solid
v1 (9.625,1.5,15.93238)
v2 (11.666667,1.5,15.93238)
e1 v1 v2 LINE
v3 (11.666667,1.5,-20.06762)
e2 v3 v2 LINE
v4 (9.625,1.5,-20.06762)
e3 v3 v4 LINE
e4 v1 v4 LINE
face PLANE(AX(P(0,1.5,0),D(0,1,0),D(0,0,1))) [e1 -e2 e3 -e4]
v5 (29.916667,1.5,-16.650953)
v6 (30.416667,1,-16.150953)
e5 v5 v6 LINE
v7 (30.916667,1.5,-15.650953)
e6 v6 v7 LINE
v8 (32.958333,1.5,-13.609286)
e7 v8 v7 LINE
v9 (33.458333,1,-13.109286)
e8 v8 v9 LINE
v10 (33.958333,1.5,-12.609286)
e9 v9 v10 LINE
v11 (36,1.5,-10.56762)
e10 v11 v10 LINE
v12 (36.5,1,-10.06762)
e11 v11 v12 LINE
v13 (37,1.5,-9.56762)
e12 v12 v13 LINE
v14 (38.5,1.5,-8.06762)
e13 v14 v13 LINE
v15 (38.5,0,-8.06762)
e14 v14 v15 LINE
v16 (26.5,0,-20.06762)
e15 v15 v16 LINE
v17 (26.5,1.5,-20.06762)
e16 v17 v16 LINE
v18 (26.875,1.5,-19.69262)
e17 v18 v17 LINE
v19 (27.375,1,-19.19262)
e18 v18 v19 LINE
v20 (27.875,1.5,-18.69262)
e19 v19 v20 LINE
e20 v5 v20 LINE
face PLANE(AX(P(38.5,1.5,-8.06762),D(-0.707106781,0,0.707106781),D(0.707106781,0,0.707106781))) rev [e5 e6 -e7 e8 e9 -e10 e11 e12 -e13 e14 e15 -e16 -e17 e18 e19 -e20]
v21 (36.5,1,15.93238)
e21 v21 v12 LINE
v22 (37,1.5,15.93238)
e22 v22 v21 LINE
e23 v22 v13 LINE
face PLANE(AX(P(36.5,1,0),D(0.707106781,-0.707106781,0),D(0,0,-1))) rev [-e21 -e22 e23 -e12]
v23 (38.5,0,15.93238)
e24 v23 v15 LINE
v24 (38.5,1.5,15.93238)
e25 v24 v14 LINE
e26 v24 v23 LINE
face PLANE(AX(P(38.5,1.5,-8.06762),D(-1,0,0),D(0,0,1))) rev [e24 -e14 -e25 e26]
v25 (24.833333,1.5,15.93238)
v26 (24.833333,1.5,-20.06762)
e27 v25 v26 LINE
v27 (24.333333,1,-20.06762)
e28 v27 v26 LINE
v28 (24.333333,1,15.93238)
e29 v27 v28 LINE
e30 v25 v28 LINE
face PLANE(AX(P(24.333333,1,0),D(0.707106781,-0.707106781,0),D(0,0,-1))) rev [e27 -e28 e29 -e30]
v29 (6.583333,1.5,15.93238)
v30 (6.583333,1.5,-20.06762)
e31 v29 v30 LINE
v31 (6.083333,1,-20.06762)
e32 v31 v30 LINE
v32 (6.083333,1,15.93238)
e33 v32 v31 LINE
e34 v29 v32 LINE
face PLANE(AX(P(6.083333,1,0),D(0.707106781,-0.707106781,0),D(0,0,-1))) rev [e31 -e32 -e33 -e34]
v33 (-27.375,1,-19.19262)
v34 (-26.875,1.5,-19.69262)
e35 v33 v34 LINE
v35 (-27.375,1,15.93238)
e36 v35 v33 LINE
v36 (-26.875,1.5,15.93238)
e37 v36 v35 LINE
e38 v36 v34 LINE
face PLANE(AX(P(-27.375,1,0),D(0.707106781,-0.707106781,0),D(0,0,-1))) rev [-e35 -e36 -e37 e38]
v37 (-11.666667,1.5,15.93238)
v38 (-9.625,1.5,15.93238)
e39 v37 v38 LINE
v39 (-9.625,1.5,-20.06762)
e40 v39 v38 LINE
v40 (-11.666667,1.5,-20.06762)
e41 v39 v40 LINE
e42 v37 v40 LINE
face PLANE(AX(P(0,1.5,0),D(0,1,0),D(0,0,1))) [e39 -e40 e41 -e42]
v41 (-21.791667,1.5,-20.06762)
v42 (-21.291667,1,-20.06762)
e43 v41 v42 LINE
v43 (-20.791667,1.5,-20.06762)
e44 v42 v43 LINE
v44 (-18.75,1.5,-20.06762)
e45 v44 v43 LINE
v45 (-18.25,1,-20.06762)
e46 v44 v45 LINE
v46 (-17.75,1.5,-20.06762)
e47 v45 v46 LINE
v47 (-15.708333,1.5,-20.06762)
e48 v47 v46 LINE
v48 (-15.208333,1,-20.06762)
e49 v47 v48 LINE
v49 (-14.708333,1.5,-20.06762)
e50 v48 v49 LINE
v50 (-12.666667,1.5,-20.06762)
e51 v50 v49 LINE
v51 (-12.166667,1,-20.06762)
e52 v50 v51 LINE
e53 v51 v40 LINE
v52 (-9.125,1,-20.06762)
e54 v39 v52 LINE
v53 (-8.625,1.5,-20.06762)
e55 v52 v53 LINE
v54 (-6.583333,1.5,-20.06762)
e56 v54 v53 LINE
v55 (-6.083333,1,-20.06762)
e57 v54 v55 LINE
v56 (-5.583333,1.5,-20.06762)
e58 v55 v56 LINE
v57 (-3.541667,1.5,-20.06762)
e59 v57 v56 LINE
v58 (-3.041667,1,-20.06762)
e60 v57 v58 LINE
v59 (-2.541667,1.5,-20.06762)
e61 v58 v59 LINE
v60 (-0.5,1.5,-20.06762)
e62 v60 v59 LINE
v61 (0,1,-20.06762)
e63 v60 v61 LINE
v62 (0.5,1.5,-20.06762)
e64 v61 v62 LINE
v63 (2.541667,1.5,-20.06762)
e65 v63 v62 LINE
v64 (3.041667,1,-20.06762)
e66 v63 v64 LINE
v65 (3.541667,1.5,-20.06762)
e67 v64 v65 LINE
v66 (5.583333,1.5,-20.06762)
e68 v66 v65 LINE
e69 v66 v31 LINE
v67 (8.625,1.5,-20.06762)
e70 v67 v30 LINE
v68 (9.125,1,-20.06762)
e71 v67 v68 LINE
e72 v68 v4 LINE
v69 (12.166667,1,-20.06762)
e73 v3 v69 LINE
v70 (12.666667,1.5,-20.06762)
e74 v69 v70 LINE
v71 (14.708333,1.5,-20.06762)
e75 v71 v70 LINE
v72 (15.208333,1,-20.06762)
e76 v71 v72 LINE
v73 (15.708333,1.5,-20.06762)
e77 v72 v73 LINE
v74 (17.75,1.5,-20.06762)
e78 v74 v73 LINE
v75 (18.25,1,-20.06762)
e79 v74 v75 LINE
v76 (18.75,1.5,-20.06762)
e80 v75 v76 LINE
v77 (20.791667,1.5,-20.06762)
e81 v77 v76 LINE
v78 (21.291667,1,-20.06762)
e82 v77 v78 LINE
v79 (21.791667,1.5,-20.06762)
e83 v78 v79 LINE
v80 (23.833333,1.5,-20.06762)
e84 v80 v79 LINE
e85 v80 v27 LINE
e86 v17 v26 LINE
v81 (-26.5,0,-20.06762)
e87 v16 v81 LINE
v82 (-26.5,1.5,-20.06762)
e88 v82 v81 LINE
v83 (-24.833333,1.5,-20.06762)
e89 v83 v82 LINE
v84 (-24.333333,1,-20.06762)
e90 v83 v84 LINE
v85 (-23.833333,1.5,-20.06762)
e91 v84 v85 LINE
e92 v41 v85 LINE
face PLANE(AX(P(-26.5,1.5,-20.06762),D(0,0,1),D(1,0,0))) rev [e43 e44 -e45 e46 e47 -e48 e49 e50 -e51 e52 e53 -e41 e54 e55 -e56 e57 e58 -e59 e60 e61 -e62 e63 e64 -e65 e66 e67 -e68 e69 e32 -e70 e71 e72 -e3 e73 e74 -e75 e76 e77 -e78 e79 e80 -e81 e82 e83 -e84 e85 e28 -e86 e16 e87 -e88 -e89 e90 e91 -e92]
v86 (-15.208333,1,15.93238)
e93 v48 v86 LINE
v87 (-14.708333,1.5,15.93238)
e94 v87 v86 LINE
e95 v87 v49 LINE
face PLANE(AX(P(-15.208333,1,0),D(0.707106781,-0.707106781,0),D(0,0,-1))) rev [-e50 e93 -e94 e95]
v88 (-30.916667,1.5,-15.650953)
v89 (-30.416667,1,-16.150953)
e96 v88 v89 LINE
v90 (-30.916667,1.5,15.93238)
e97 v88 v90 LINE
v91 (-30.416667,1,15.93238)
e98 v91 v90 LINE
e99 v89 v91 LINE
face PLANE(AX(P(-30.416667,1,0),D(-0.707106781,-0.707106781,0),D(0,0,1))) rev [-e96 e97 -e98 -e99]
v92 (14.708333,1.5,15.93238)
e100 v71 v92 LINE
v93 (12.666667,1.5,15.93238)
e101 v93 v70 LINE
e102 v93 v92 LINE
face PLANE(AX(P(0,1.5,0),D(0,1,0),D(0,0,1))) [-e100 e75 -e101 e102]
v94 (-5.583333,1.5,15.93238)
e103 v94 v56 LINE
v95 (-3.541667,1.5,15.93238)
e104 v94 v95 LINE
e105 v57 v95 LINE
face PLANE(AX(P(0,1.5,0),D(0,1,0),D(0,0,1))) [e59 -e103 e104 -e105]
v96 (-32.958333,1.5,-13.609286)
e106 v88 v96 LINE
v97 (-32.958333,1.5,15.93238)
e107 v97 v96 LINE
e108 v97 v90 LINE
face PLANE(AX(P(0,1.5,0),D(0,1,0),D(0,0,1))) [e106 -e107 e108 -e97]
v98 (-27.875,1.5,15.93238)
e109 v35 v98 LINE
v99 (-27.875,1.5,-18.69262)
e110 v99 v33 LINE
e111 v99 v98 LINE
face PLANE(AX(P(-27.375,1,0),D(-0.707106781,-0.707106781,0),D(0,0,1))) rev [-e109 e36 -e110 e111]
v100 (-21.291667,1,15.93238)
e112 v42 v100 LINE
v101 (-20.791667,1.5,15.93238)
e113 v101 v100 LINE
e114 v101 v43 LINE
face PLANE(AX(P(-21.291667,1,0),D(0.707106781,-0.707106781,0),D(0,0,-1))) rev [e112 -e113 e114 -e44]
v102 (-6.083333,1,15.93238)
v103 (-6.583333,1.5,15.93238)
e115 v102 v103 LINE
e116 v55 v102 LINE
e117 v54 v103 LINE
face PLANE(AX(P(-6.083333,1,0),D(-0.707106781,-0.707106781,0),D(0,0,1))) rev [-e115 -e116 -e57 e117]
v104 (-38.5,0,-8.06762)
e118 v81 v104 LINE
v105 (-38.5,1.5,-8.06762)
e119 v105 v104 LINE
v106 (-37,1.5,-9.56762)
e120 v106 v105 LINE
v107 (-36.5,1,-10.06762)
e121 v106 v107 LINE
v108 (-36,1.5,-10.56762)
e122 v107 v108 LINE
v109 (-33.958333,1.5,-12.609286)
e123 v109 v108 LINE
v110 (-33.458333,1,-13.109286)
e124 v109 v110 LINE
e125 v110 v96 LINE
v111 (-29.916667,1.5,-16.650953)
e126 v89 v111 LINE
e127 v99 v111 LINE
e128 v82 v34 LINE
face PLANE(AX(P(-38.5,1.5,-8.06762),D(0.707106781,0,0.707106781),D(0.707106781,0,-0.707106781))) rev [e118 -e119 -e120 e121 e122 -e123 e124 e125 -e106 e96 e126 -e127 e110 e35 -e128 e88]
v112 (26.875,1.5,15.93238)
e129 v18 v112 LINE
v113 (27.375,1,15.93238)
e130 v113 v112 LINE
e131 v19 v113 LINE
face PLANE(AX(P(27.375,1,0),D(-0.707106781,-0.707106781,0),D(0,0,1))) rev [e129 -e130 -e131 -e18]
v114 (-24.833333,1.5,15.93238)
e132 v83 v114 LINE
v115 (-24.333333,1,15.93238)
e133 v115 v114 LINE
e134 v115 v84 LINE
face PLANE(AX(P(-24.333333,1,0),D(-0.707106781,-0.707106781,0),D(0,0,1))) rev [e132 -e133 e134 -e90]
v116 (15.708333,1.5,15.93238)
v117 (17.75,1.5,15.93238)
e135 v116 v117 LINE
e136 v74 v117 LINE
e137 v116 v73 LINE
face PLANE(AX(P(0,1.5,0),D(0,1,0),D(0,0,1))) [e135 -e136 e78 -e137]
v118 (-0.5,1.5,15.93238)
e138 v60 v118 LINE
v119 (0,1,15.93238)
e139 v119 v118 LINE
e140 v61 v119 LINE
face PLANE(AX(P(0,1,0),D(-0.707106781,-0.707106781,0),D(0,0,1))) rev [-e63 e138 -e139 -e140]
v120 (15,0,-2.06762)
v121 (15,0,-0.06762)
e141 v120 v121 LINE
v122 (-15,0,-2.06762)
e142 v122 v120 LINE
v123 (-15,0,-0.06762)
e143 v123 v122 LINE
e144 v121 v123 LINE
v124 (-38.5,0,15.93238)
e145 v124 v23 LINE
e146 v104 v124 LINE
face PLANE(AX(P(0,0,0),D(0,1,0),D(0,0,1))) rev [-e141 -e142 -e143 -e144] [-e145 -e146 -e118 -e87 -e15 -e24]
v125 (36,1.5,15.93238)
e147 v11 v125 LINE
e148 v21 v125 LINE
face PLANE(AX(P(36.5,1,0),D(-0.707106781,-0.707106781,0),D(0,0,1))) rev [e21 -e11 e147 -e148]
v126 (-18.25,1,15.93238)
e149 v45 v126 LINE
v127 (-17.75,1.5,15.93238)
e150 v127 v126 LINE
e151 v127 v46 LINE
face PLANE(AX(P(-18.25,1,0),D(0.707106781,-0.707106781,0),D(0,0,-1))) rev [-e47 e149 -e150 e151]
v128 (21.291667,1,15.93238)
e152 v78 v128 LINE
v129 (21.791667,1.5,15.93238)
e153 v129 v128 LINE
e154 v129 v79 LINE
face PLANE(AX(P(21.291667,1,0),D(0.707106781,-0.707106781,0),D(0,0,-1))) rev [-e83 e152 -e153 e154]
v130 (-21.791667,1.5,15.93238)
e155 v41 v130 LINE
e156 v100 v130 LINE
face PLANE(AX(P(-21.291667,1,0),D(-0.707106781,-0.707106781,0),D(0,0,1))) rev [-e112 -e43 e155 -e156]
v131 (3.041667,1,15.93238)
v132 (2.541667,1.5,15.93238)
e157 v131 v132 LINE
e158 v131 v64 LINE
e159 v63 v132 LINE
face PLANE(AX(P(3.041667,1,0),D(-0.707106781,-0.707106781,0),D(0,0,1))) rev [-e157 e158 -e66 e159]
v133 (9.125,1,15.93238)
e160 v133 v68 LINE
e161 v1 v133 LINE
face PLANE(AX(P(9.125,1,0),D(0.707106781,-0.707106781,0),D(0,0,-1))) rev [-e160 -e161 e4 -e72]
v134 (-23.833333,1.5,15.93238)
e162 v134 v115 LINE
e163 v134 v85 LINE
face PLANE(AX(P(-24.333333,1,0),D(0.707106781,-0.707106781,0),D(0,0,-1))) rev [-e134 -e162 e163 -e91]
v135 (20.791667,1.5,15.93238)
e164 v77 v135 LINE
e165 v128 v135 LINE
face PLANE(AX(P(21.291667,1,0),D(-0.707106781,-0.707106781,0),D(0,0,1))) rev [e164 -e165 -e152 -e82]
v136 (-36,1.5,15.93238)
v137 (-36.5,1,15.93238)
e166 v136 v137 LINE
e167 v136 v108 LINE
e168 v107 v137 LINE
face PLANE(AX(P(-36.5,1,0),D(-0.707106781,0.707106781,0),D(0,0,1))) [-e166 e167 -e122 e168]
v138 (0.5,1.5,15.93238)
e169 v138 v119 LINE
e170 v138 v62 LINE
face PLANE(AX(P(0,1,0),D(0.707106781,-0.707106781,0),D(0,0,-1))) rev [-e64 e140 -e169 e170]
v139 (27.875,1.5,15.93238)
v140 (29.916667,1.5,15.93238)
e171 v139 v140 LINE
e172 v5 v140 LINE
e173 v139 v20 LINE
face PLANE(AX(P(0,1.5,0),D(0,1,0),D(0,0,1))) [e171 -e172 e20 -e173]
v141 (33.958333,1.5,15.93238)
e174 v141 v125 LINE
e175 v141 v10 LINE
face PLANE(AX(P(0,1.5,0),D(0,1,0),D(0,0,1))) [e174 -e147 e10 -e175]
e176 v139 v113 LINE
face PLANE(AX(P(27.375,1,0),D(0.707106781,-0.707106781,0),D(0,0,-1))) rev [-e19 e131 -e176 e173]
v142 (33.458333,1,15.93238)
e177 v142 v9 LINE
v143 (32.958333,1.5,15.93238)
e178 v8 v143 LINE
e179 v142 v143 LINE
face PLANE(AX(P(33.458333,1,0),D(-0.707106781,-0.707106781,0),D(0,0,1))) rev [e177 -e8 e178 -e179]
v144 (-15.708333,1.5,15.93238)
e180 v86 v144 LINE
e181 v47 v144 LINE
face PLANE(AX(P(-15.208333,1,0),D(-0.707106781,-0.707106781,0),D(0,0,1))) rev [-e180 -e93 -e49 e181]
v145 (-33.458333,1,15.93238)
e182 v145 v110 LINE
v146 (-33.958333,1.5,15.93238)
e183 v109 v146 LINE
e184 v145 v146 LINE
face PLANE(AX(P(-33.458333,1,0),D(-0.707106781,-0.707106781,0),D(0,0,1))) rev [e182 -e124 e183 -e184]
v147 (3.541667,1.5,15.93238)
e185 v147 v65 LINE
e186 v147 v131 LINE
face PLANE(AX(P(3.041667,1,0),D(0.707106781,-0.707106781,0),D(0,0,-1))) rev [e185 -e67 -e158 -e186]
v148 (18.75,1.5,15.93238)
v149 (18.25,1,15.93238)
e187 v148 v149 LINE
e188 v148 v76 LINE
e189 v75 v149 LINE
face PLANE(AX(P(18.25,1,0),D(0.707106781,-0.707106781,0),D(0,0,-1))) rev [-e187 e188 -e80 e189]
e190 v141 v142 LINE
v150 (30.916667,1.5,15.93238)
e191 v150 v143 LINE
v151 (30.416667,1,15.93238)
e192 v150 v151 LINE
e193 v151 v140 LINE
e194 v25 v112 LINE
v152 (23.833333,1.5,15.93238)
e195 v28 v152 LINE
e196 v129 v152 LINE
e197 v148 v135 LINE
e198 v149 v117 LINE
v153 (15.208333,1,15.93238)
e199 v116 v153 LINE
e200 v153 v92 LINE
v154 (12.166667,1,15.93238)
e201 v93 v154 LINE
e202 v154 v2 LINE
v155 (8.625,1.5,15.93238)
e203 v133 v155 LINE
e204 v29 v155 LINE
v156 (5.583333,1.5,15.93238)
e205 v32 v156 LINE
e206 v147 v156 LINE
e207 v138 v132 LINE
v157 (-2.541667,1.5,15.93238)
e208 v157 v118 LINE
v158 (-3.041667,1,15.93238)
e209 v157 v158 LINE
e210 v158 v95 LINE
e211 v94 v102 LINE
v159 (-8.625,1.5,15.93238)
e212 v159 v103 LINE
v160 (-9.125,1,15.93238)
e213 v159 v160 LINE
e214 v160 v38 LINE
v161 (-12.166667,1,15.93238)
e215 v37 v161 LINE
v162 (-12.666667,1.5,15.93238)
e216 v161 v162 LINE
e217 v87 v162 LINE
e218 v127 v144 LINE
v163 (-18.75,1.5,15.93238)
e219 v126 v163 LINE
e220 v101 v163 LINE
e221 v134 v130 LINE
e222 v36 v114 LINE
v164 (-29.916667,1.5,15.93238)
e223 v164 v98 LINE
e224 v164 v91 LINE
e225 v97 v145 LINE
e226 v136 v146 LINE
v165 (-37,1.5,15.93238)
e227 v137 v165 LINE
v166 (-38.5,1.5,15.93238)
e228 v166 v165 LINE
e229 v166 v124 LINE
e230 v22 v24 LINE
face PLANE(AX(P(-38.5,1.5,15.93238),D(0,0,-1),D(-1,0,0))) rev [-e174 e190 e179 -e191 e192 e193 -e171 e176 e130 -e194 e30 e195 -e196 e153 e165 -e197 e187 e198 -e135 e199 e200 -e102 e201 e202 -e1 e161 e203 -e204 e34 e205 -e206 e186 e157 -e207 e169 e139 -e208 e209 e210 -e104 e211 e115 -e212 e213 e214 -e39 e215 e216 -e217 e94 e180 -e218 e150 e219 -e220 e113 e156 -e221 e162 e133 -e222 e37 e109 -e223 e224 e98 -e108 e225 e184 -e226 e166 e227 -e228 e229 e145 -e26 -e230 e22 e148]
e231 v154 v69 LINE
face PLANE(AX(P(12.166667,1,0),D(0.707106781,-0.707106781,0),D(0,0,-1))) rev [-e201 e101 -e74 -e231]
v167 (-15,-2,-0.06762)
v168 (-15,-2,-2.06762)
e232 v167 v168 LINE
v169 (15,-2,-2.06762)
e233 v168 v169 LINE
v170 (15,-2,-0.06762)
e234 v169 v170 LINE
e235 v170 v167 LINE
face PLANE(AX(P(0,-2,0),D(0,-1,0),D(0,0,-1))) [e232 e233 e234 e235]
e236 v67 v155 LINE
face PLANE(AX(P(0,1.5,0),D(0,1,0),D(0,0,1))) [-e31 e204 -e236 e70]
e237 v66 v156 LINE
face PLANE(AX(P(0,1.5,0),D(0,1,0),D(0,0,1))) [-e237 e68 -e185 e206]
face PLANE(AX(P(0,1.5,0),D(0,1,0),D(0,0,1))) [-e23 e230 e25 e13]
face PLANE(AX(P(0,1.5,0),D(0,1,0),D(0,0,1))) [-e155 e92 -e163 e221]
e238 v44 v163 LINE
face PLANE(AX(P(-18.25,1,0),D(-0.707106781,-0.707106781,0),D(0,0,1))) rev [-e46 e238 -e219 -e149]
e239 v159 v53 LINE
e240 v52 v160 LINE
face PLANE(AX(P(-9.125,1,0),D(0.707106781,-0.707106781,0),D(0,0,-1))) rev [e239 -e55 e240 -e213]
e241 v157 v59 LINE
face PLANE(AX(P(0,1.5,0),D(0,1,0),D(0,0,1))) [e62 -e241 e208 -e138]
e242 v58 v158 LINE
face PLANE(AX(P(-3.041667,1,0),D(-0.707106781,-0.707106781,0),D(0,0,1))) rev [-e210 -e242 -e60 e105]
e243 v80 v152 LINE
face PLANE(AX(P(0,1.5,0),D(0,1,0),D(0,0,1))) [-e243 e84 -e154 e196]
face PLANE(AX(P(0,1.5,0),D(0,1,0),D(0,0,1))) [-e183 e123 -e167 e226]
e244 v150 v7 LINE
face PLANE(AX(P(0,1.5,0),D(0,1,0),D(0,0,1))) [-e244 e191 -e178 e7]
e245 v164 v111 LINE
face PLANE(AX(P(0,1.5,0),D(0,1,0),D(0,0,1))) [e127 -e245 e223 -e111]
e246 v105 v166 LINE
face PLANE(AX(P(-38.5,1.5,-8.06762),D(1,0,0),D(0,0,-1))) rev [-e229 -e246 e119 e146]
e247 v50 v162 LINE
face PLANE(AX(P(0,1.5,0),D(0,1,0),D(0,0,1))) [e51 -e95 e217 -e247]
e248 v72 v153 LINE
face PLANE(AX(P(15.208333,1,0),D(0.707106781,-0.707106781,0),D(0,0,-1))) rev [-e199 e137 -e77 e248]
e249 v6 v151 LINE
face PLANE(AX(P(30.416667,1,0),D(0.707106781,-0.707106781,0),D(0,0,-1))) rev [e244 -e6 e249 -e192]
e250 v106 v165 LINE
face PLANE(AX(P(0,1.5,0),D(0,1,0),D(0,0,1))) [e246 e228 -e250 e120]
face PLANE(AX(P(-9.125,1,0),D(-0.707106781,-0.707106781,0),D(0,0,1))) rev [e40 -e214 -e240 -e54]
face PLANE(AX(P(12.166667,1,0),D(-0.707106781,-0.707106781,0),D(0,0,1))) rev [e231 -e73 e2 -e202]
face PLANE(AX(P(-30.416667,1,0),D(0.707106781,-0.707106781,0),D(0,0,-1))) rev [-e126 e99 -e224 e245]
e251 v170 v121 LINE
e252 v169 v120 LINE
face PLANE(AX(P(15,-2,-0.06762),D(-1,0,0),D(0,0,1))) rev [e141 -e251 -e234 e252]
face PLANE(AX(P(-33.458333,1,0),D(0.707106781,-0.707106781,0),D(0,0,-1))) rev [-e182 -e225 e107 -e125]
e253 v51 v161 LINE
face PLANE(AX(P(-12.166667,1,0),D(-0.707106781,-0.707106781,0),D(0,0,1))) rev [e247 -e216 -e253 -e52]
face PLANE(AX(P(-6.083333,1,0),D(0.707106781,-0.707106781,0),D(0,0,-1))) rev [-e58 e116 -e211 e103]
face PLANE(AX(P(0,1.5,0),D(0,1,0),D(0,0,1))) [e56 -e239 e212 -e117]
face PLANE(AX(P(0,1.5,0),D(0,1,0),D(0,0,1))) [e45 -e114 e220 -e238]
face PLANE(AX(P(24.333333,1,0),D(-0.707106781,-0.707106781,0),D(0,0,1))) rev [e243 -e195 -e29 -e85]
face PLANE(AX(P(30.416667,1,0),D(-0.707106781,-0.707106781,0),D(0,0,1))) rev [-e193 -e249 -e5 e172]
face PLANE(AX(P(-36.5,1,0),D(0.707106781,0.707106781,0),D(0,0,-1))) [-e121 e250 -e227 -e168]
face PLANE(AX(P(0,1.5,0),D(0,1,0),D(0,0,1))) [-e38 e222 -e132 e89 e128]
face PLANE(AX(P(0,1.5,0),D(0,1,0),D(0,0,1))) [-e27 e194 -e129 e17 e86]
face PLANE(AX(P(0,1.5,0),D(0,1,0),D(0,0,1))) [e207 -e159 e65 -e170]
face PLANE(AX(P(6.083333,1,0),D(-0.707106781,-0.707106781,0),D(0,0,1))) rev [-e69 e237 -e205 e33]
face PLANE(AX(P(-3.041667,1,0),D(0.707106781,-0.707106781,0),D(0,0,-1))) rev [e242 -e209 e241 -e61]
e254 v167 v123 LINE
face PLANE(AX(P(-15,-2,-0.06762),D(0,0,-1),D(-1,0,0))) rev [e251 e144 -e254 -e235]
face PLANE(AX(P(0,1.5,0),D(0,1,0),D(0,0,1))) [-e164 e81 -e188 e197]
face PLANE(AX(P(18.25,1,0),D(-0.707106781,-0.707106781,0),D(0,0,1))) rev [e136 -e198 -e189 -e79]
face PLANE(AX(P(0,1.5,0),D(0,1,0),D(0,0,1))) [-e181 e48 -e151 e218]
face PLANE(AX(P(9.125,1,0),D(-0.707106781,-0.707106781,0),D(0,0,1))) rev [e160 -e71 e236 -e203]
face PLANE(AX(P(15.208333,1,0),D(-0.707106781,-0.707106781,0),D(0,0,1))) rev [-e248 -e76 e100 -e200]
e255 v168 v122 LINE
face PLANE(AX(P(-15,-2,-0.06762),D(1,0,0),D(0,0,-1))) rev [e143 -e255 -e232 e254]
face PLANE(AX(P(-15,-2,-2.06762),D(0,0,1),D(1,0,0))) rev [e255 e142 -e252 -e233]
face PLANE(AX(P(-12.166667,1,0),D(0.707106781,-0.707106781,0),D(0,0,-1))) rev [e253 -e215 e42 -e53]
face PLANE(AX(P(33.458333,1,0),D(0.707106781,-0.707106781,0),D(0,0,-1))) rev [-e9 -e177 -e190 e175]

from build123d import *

# Parameters (mm, degrees)
BOSS_EXTRUDE1_DEPTH = 1.5
SKETCH2_W           = 1
SKETCH2_H           = 36
CUT_EXTRUDE1_DEPTH  = 0.5
SKETCH3_W           = 30
SKETCH3_H           = 2
BOSS_EXTRUDE2_DEPTH = 2
CHAMFER1_SIZE       = 0.5


with BuildPart() as part:
    # Sketch1 → Boss-Extrude1 (new body)
    with BuildSketch(Plane(origin=(0, 0, 0), x_dir=(1, 0, 0), z_dir=(0, 1, 0))):
        Polygon((-38.5, 8.06761956), (-26.5, 20.06761956), (26.5, 20.06761956), (38.5, 8.06761956), (38.5, -15.93238044), (-38.5, -15.93238044), align=None)
    extrude(amount=BOSS_EXTRUDE1_DEPTH)

    # Sketch2 → Cut-Extrude1 (cut)
    with BuildSketch(Plane(origin=(0, 1.5, 0), x_dir=(1, 0, 0), z_dir=(0, 1, 0))):
        with Locations((-36.5, 2.06761956)):
            Rectangle(SKETCH2_W, SKETCH2_H)
        with Locations((-33.458333333, 2.06761956)):
            Rectangle(SKETCH2_W, SKETCH2_H)
        with Locations((-30.416666667, 2.06761956)):
            Rectangle(SKETCH2_W, SKETCH2_H)
        with Locations((-27.375, 2.06761956)):
            Rectangle(SKETCH2_W, SKETCH2_H)
        with Locations((-24.333333333, 2.06761956)):
            Rectangle(SKETCH2_W, SKETCH2_H)
        with Locations((-21.291666667, 2.06761956)):
            Rectangle(SKETCH2_W, SKETCH2_H)
        with Locations((-18.25, 2.06761956)):
            Rectangle(SKETCH2_W, SKETCH2_H)
        with Locations((-15.208333333, 2.06761956)):
            Rectangle(SKETCH2_W, SKETCH2_H)
        with Locations((-12.166666667, 2.06761956)):
            Rectangle(SKETCH2_W, SKETCH2_H)
        with Locations((-9.125, 2.06761956)):
            Rectangle(SKETCH2_W, SKETCH2_H)
        with Locations((-6.083333333, 2.06761956)):
            Rectangle(SKETCH2_W, SKETCH2_H)
        with Locations((-3.041666667, 2.06761956)):
            Rectangle(SKETCH2_W, SKETCH2_H)
        with Locations((0, 2.06761956)):
            Rectangle(SKETCH2_W, SKETCH2_H)
        with Locations((3.041666667, 2.06761956)):
            Rectangle(SKETCH2_W, SKETCH2_H)
        with Locations((6.083333333, 2.06761956)):
            Rectangle(SKETCH2_W, SKETCH2_H)
        with Locations((9.125, 2.06761956)):
            Rectangle(SKETCH2_W, SKETCH2_H)
        with Locations((12.166666667, 2.06761956)):
            Rectangle(SKETCH2_W, SKETCH2_H)
        with Locations((15.208333333, 2.06761956)):
            Rectangle(SKETCH2_W, SKETCH2_H)
        with Locations((18.25, 2.06761956)):
            Rectangle(SKETCH2_W, SKETCH2_H)
        with Locations((21.291666667, 2.06761956)):
            Rectangle(SKETCH2_W, SKETCH2_H)
        with Locations((24.333333333, 2.06761956)):
            Rectangle(SKETCH2_W, SKETCH2_H)
        with Locations((27.375, 2.06761956)):
            Rectangle(SKETCH2_W, SKETCH2_H)
        with Locations((30.416666667, 2.06761956)):
            Rectangle(SKETCH2_W, SKETCH2_H)
        with Locations((33.458333333, 2.06761956)):
            Rectangle(SKETCH2_W, SKETCH2_H)
        with Locations((36.5, 2.06761956)):
            Rectangle(SKETCH2_W, SKETCH2_H)
    extrude(amount=-CUT_EXTRUDE1_DEPTH, mode=Mode.SUBTRACT)

    # Sketch3 → Boss-Extrude2 (add)
    with BuildSketch(Plane.XZ):
        with Locations((0, -1.06761956)):
            Rectangle(SKETCH3_W, SKETCH3_H)
    extrude(amount=BOSS_EXTRUDE2_DEPTH)

    # Chamfer1
    chamfer1_edges = [part.edges().sort_by_distance(p)[0] for p in [
        (36, 1, 2.68238044),
        (32.958333333, 1, 1.161547107),
        (37, 1, 3.18238044),
        (33.958333333, 1, 1.661547107),
        (30.916666667, 1, 0.140713774),
        (27.875, 1, -1.38011956),
        (24.833333333, 1, -2.06761956),
        (21.791666667, 1, -2.06761956),
        (18.75, 1, -2.06761956),
        (15.708333333, 1, -2.06761956),
        (29.916666667, 1, -0.359286226),
        (26.875, 1, -1.88011956),
        (23.833333333, 1, -2.06761956),
        (20.791666667, 1, -2.06761956),
        (17.75, 1, -2.06761956),
        (14.708333333, 1, -2.06761956),
        (11.666666667, 1, -2.06761956),
        (8.625, 1, -2.06761956),
        (5.583333333, 1, -2.06761956),
        (2.541666667, 1, -2.06761956),
        (12.666666667, 1, -2.06761956),
        (9.625, 1, -2.06761956),
        (6.583333333, 1, -2.06761956),
        (3.541666667, 1, -2.06761956),
        (0.5, 1, -2.06761956),
        (-2.541666667, 1, -2.06761956),
        (-5.583333333, 1, -2.06761956),
        (-8.625, 1, -2.06761956),
        (-11.666666667, 1, -2.06761956),
        (-14.708333333, 1, -2.06761956),
        (-17.75, 1, -2.06761956),
        (-20.791666667, 1, -2.06761956),
        (-0.5, 1, -2.06761956),
        (-3.541666667, 1, -2.06761956),
        (-6.583333333, 1, -2.06761956),
        (-9.625, 1, -2.06761956),
        (-12.666666667, 1, -2.06761956),
        (-15.708333333, 1, -2.06761956),
        (-18.75, 1, -2.06761956),
        (-21.791666667, 1, -2.06761956),
        (-24.833333333, 1, -2.06761956),
        (-27.875, 1, -1.38011956),
        (-23.833333333, 1, -2.06761956),
        (-26.875, 1, -1.88011956),
        (-29.916666667, 1, -0.359286226),
        (-30.916666667, 1, 0.140713774),
        (-33.958333333, 1, 1.661547107),
        (-32.958333333, 1, 1.161547107),
        (-36, 1, 2.68238044),
        (-37, 1, 3.18238044),
    ]]
    chamfer(chamfer1_edges, length=CHAMFER1_SIZE - 0.0001)  # a hair under: the kernel refuses the full size


solid = part.part
